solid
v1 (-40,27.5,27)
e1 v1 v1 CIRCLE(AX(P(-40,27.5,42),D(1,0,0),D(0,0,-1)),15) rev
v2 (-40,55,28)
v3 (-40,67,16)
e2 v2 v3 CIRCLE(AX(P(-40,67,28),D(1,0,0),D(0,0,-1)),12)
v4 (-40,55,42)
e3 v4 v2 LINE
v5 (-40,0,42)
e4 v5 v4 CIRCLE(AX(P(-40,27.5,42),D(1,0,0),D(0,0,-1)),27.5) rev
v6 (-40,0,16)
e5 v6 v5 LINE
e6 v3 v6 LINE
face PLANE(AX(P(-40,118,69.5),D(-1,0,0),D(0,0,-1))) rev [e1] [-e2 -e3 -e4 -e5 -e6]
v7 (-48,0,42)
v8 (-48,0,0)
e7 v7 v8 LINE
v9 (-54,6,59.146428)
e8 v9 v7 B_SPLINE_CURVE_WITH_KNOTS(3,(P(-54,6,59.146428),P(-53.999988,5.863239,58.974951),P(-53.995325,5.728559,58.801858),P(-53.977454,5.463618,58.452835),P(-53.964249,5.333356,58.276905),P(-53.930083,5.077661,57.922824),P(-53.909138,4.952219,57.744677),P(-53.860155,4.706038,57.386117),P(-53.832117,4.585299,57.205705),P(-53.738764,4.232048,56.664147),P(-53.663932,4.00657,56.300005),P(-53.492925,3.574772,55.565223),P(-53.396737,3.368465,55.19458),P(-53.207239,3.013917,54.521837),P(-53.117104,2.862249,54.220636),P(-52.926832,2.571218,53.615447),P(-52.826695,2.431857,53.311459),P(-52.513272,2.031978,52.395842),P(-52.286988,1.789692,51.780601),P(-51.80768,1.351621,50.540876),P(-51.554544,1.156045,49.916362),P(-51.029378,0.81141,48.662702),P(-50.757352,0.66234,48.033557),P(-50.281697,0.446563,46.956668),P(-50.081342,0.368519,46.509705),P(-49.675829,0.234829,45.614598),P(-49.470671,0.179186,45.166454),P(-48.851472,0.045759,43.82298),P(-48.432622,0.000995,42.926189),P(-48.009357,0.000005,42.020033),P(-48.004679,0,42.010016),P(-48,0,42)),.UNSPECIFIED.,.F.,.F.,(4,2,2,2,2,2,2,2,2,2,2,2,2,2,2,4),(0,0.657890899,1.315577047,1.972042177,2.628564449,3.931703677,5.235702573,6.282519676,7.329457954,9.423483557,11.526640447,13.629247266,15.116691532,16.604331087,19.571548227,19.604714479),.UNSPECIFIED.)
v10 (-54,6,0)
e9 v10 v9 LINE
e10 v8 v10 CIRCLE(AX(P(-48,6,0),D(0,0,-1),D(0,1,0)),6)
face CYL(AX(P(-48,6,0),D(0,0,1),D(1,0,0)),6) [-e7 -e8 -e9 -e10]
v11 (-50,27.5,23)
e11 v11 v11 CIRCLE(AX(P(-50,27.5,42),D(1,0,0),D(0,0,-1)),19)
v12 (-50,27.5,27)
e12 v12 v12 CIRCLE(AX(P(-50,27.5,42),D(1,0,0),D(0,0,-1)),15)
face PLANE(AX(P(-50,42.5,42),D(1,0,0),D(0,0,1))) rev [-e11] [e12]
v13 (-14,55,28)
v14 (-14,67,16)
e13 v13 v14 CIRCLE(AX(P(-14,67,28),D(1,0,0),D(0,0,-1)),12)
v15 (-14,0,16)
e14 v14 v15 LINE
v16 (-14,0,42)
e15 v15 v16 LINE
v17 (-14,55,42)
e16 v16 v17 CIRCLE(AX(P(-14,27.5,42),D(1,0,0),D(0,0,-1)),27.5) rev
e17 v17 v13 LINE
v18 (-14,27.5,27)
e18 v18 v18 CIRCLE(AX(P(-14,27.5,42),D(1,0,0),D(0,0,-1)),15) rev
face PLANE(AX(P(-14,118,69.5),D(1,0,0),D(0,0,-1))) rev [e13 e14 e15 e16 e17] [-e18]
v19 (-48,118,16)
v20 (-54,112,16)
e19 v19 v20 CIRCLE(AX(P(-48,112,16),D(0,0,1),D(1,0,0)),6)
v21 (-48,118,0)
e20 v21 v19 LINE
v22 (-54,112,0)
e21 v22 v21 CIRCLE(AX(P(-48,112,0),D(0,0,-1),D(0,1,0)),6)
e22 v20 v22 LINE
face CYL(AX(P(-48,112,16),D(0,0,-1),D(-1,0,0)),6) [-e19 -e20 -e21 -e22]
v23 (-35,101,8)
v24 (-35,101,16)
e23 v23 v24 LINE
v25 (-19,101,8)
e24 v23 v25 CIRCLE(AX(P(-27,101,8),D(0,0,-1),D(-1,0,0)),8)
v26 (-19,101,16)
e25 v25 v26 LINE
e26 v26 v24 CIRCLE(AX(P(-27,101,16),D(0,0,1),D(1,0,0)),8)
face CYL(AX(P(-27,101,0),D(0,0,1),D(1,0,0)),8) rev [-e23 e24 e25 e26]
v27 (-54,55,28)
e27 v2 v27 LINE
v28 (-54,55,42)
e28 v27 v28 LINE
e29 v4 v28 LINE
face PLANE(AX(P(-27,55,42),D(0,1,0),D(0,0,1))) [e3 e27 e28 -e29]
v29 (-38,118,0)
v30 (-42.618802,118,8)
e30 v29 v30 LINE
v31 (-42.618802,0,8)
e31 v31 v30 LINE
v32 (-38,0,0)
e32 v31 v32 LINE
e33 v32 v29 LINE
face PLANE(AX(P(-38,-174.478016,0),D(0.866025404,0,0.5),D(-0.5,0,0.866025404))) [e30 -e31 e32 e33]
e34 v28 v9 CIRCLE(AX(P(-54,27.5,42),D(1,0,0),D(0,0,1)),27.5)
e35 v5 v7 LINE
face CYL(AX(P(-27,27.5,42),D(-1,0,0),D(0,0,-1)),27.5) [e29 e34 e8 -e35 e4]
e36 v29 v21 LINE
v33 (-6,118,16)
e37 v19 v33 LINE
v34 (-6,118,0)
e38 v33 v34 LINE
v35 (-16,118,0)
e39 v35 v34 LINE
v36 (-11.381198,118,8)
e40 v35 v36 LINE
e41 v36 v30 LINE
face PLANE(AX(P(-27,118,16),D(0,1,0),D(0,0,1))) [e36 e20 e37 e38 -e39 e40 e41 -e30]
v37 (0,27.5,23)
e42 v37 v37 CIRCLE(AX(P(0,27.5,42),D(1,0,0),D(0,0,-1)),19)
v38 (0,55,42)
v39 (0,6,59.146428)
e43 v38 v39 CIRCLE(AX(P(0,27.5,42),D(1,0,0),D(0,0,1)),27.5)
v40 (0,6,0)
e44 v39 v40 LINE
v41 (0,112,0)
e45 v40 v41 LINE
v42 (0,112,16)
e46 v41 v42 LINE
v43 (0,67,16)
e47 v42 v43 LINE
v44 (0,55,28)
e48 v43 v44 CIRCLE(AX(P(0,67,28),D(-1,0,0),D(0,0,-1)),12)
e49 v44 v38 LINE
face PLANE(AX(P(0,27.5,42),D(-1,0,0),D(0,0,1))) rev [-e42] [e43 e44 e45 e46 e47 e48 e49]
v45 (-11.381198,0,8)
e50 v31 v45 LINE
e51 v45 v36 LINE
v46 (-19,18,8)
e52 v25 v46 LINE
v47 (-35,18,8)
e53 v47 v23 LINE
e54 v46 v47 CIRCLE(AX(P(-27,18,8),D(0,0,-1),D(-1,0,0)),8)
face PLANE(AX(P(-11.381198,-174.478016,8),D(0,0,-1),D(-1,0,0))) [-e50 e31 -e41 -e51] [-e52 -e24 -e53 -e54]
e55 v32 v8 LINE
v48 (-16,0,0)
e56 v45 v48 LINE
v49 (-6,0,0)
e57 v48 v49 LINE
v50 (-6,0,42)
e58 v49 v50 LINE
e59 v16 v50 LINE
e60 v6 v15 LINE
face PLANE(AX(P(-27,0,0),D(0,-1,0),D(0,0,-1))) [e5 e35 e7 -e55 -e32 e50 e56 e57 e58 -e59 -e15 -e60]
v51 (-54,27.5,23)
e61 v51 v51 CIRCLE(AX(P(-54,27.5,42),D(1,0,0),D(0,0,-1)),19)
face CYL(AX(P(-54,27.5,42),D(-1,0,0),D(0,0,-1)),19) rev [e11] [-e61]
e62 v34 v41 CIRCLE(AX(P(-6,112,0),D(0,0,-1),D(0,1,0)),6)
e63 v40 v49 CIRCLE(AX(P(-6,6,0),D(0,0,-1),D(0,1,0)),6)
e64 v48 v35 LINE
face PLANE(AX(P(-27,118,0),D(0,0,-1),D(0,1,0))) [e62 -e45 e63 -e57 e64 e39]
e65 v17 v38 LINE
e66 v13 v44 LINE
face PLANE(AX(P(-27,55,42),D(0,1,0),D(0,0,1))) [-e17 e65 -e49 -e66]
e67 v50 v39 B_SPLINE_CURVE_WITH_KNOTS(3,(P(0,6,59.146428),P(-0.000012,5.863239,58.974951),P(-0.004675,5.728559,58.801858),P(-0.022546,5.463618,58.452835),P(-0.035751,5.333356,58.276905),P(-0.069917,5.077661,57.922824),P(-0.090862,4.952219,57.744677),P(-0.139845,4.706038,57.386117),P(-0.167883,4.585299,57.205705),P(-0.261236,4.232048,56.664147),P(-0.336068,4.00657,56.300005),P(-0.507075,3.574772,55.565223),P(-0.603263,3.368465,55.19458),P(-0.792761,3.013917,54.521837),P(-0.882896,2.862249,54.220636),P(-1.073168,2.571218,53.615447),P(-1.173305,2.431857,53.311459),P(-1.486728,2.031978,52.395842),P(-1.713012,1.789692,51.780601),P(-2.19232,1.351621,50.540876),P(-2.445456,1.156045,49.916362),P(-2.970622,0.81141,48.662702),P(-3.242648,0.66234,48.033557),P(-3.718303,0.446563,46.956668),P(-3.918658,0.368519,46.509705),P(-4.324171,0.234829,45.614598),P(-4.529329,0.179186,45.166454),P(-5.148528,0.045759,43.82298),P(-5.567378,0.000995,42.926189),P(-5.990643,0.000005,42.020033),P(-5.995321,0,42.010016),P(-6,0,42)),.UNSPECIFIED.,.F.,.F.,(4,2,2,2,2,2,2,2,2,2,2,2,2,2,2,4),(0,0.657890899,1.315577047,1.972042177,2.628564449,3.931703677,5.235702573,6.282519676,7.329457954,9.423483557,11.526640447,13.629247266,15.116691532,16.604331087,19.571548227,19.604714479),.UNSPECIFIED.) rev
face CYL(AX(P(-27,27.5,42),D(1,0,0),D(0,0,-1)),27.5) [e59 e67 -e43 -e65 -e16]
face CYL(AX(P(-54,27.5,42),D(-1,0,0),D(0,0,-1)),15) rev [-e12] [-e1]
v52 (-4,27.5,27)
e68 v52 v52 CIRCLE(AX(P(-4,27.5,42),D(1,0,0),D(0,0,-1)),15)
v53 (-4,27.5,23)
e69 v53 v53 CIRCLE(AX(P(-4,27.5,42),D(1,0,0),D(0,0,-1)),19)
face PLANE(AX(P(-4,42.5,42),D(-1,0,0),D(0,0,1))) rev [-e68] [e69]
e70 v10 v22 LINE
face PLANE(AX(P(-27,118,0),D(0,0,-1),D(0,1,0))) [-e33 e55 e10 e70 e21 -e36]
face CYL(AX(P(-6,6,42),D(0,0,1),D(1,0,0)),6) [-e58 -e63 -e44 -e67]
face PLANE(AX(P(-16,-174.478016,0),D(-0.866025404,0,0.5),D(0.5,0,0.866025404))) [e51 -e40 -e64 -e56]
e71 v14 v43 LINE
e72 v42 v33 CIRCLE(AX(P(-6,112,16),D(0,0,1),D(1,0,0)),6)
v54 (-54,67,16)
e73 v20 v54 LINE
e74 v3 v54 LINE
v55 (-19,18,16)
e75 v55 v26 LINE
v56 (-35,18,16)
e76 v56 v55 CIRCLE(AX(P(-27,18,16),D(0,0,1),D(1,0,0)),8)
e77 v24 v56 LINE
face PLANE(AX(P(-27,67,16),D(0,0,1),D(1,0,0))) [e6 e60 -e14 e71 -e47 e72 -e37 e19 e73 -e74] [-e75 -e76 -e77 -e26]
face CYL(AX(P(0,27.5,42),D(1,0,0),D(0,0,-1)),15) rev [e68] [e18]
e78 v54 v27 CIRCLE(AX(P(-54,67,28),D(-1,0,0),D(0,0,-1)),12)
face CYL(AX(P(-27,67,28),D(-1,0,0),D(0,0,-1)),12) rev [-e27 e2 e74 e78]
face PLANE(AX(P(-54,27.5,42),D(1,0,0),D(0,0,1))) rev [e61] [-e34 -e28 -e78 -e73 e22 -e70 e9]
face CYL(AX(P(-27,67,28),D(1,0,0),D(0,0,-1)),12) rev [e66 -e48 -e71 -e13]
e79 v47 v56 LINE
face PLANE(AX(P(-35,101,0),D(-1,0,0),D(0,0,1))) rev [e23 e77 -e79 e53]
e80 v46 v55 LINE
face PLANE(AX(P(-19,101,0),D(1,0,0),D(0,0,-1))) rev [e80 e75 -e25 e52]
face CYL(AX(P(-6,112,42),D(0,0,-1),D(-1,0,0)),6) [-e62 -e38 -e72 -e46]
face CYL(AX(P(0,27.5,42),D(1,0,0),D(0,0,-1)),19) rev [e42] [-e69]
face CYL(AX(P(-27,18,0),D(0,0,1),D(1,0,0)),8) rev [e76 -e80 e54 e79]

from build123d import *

# Parameters (mm, degrees)
BOSS_EXTRUDE1_DEPTH                     = 27
CBORE_FOR_M5_HEX_HEAD_BOLT1_D           = 30
CBORE_FOR_M5_HEX_HEAD_BOLT1_CBORE_D     = 38
CBORE_FOR_M5_HEX_HEAD_BOLT1_CBORE_DEPTH = 4
SKETCH5_W                               = 13
SKETCH5_H                               = 53.5
CUT_EXTRUDE2_DEPTH                      = 140.582412932
CUT_EXTRUDE3_DEPTH                      = 140.582412932
CUT_EXTRUDE3_DEPTH_BACK                 = 140.582412932
CUT_EXTRUDE4_DEPTH                      = 141.36470354
FILLET1_R                               = 6
FILLET2_R                               = 6


with BuildPart() as part:
    # Sketch1 → Boss-Extrude1 (new body)
    with BuildSketch(Plane.YZ):
        with BuildLine():
            Line((0, 0), (0, 42))
            ThreePointArc((0, 42), (27.5, 69.5), (55, 42))
            Line((55, 42), (55, 28))
            ThreePointArc((55, 28), (58.514718626, 19.514718626), (67, 16))
            Line((67, 16), (118, 16))
            Line((118, 16), (118, 0))
            Line((118, 0), (0, 0))
        make_face()
    extrude(amount=-BOSS_EXTRUDE1_DEPTH)

    # CBORE for M5 Hex Head Bolt1 (through all)
    with Locations(Plane.YZ):
        with Locations((27.5, 42)):
            CounterBoreHole(CBORE_FOR_M5_HEX_HEAD_BOLT1_D / 2, CBORE_FOR_M5_HEX_HEAD_BOLT1_CBORE_D / 2, CBORE_FOR_M5_HEX_HEAD_BOLT1_CBORE_DEPTH)

    # Sketch5 → Cut-Extrude2 (cut, through all)
    with BuildSketch(Plane.XZ):
        with Locations((-20.5, 42.75)):
            Rectangle(SKETCH5_W, SKETCH5_H)
    extrude(amount=-CUT_EXTRUDE2_DEPTH, mode=Mode.SUBTRACT)

    # Sketch6 → Cut-Extrude3 (cut, two sides: drawn at the far end of the back side and taken through both)
    with BuildSketch(Plane.XZ.offset(-CUT_EXTRUDE3_DEPTH_BACK)):
        Polygon((-92.317950055, -132.186567024), (-16, 0), (-11.381197846, 8), (-27, 8), (-179.635900109, 8), (-438.753666214, -153.396577713), (-351.43571616, -293.583144737), align=None)
    extrude(amount=CUT_EXTRUDE3_DEPTH + CUT_EXTRUDE3_DEPTH_BACK, mode=Mode.SUBTRACT)

    # Mirror1: part across plane


with BuildPart() as part_1:
    add(part.part)
    add(part.part.mirror(Plane(origin=(-27, 27.5, 42), x_dir=(0, 0, 1), z_dir=(-1, 0, 0))))

    # Sketch7 → Cut-Extrude4 (cut, through all)
    with BuildSketch(Plane.XY.offset(16)):
        with BuildLine():
            Line((-19, 101), (-19, 18))
            ThreePointArc((-19, 18), (-27, 10), (-35, 18))
            Line((-35, 18), (-35, 101))
            ThreePointArc((-35, 101), (-27, 109), (-19, 101))
        make_face()
    extrude(amount=-CUT_EXTRUDE4_DEPTH, mode=Mode.SUBTRACT)

    # Fillet1
    # the kernel refuses this fillet: 6 mm, written as the material it takes off along each edge
    with BuildSketch(Plane(origin=(0, 0, -36), x_dir=(0, 1, 0), z_dir=(0, 0, 1))) as fillet1_piece_1:
        with BuildLine():
            CenterArc((FILLET1_R, FILLET1_R), FILLET1_R, 180, 90)
            Line((0, FILLET1_R), (-FILLET1_R * 0.02, FILLET1_R))
            Line((-FILLET1_R * 0.02, FILLET1_R), (-FILLET1_R * 0.02, -FILLET1_R * 0.02))
            Line((-FILLET1_R * 0.02, -FILLET1_R * 0.02), (FILLET1_R, -FILLET1_R * 0.02))
            Line((FILLET1_R, -FILLET1_R * 0.02), (FILLET1_R, 0))
        make_face()
    extrude(amount=114, mode=Mode.SUBTRACT)

    # Fillet2
    # the kernel refuses this fillet: 6 mm, written as the material it takes off along each edge
    with BuildSketch(Plane(origin=(-54, 0, -36), x_dir=(0, 1, 0), z_dir=(0, 0, 1))) as fillet2_piece_1:
        with BuildLine():
            CenterArc((FILLET2_R, -FILLET2_R), FILLET2_R, 90, 90)
            Line((0, -FILLET2_R), (-FILLET2_R * 0.02, -FILLET2_R))
            Line((-FILLET2_R * 0.02, -FILLET2_R), (-FILLET2_R * 0.02, FILLET2_R * 0.02))
            Line((-FILLET2_R * 0.02, FILLET2_R * 0.02), (FILLET2_R, FILLET2_R * 0.02))
            Line((FILLET2_R, FILLET2_R * 0.02), (FILLET2_R, 0))
        make_face()
    extrude(amount=114, mode=Mode.SUBTRACT)
    with BuildSketch(Plane(origin=(-54, 118, 52), x_dir=(1, 0, 0), z_dir=(0, 0, -1)), Plane(origin=(0, 118, 52), x_dir=(0, -1, 0), z_dir=(0, 0, -1))) as fillet2_piece_2:
        with BuildLine():
            CenterArc((FILLET2_R, FILLET2_R), FILLET2_R, 180, 90)
            Line((0, FILLET2_R), (-FILLET2_R * 0.02, FILLET2_R))
            Line((-FILLET2_R * 0.02, FILLET2_R), (-FILLET2_R * 0.02, -FILLET2_R * 0.02))
            Line((-FILLET2_R * 0.02, -FILLET2_R * 0.02), (FILLET2_R, -FILLET2_R * 0.02))
            Line((FILLET2_R, -FILLET2_R * 0.02), (FILLET2_R, 0))
        make_face()
    extrude(amount=88, mode=Mode.SUBTRACT)


solid = part_1.part
